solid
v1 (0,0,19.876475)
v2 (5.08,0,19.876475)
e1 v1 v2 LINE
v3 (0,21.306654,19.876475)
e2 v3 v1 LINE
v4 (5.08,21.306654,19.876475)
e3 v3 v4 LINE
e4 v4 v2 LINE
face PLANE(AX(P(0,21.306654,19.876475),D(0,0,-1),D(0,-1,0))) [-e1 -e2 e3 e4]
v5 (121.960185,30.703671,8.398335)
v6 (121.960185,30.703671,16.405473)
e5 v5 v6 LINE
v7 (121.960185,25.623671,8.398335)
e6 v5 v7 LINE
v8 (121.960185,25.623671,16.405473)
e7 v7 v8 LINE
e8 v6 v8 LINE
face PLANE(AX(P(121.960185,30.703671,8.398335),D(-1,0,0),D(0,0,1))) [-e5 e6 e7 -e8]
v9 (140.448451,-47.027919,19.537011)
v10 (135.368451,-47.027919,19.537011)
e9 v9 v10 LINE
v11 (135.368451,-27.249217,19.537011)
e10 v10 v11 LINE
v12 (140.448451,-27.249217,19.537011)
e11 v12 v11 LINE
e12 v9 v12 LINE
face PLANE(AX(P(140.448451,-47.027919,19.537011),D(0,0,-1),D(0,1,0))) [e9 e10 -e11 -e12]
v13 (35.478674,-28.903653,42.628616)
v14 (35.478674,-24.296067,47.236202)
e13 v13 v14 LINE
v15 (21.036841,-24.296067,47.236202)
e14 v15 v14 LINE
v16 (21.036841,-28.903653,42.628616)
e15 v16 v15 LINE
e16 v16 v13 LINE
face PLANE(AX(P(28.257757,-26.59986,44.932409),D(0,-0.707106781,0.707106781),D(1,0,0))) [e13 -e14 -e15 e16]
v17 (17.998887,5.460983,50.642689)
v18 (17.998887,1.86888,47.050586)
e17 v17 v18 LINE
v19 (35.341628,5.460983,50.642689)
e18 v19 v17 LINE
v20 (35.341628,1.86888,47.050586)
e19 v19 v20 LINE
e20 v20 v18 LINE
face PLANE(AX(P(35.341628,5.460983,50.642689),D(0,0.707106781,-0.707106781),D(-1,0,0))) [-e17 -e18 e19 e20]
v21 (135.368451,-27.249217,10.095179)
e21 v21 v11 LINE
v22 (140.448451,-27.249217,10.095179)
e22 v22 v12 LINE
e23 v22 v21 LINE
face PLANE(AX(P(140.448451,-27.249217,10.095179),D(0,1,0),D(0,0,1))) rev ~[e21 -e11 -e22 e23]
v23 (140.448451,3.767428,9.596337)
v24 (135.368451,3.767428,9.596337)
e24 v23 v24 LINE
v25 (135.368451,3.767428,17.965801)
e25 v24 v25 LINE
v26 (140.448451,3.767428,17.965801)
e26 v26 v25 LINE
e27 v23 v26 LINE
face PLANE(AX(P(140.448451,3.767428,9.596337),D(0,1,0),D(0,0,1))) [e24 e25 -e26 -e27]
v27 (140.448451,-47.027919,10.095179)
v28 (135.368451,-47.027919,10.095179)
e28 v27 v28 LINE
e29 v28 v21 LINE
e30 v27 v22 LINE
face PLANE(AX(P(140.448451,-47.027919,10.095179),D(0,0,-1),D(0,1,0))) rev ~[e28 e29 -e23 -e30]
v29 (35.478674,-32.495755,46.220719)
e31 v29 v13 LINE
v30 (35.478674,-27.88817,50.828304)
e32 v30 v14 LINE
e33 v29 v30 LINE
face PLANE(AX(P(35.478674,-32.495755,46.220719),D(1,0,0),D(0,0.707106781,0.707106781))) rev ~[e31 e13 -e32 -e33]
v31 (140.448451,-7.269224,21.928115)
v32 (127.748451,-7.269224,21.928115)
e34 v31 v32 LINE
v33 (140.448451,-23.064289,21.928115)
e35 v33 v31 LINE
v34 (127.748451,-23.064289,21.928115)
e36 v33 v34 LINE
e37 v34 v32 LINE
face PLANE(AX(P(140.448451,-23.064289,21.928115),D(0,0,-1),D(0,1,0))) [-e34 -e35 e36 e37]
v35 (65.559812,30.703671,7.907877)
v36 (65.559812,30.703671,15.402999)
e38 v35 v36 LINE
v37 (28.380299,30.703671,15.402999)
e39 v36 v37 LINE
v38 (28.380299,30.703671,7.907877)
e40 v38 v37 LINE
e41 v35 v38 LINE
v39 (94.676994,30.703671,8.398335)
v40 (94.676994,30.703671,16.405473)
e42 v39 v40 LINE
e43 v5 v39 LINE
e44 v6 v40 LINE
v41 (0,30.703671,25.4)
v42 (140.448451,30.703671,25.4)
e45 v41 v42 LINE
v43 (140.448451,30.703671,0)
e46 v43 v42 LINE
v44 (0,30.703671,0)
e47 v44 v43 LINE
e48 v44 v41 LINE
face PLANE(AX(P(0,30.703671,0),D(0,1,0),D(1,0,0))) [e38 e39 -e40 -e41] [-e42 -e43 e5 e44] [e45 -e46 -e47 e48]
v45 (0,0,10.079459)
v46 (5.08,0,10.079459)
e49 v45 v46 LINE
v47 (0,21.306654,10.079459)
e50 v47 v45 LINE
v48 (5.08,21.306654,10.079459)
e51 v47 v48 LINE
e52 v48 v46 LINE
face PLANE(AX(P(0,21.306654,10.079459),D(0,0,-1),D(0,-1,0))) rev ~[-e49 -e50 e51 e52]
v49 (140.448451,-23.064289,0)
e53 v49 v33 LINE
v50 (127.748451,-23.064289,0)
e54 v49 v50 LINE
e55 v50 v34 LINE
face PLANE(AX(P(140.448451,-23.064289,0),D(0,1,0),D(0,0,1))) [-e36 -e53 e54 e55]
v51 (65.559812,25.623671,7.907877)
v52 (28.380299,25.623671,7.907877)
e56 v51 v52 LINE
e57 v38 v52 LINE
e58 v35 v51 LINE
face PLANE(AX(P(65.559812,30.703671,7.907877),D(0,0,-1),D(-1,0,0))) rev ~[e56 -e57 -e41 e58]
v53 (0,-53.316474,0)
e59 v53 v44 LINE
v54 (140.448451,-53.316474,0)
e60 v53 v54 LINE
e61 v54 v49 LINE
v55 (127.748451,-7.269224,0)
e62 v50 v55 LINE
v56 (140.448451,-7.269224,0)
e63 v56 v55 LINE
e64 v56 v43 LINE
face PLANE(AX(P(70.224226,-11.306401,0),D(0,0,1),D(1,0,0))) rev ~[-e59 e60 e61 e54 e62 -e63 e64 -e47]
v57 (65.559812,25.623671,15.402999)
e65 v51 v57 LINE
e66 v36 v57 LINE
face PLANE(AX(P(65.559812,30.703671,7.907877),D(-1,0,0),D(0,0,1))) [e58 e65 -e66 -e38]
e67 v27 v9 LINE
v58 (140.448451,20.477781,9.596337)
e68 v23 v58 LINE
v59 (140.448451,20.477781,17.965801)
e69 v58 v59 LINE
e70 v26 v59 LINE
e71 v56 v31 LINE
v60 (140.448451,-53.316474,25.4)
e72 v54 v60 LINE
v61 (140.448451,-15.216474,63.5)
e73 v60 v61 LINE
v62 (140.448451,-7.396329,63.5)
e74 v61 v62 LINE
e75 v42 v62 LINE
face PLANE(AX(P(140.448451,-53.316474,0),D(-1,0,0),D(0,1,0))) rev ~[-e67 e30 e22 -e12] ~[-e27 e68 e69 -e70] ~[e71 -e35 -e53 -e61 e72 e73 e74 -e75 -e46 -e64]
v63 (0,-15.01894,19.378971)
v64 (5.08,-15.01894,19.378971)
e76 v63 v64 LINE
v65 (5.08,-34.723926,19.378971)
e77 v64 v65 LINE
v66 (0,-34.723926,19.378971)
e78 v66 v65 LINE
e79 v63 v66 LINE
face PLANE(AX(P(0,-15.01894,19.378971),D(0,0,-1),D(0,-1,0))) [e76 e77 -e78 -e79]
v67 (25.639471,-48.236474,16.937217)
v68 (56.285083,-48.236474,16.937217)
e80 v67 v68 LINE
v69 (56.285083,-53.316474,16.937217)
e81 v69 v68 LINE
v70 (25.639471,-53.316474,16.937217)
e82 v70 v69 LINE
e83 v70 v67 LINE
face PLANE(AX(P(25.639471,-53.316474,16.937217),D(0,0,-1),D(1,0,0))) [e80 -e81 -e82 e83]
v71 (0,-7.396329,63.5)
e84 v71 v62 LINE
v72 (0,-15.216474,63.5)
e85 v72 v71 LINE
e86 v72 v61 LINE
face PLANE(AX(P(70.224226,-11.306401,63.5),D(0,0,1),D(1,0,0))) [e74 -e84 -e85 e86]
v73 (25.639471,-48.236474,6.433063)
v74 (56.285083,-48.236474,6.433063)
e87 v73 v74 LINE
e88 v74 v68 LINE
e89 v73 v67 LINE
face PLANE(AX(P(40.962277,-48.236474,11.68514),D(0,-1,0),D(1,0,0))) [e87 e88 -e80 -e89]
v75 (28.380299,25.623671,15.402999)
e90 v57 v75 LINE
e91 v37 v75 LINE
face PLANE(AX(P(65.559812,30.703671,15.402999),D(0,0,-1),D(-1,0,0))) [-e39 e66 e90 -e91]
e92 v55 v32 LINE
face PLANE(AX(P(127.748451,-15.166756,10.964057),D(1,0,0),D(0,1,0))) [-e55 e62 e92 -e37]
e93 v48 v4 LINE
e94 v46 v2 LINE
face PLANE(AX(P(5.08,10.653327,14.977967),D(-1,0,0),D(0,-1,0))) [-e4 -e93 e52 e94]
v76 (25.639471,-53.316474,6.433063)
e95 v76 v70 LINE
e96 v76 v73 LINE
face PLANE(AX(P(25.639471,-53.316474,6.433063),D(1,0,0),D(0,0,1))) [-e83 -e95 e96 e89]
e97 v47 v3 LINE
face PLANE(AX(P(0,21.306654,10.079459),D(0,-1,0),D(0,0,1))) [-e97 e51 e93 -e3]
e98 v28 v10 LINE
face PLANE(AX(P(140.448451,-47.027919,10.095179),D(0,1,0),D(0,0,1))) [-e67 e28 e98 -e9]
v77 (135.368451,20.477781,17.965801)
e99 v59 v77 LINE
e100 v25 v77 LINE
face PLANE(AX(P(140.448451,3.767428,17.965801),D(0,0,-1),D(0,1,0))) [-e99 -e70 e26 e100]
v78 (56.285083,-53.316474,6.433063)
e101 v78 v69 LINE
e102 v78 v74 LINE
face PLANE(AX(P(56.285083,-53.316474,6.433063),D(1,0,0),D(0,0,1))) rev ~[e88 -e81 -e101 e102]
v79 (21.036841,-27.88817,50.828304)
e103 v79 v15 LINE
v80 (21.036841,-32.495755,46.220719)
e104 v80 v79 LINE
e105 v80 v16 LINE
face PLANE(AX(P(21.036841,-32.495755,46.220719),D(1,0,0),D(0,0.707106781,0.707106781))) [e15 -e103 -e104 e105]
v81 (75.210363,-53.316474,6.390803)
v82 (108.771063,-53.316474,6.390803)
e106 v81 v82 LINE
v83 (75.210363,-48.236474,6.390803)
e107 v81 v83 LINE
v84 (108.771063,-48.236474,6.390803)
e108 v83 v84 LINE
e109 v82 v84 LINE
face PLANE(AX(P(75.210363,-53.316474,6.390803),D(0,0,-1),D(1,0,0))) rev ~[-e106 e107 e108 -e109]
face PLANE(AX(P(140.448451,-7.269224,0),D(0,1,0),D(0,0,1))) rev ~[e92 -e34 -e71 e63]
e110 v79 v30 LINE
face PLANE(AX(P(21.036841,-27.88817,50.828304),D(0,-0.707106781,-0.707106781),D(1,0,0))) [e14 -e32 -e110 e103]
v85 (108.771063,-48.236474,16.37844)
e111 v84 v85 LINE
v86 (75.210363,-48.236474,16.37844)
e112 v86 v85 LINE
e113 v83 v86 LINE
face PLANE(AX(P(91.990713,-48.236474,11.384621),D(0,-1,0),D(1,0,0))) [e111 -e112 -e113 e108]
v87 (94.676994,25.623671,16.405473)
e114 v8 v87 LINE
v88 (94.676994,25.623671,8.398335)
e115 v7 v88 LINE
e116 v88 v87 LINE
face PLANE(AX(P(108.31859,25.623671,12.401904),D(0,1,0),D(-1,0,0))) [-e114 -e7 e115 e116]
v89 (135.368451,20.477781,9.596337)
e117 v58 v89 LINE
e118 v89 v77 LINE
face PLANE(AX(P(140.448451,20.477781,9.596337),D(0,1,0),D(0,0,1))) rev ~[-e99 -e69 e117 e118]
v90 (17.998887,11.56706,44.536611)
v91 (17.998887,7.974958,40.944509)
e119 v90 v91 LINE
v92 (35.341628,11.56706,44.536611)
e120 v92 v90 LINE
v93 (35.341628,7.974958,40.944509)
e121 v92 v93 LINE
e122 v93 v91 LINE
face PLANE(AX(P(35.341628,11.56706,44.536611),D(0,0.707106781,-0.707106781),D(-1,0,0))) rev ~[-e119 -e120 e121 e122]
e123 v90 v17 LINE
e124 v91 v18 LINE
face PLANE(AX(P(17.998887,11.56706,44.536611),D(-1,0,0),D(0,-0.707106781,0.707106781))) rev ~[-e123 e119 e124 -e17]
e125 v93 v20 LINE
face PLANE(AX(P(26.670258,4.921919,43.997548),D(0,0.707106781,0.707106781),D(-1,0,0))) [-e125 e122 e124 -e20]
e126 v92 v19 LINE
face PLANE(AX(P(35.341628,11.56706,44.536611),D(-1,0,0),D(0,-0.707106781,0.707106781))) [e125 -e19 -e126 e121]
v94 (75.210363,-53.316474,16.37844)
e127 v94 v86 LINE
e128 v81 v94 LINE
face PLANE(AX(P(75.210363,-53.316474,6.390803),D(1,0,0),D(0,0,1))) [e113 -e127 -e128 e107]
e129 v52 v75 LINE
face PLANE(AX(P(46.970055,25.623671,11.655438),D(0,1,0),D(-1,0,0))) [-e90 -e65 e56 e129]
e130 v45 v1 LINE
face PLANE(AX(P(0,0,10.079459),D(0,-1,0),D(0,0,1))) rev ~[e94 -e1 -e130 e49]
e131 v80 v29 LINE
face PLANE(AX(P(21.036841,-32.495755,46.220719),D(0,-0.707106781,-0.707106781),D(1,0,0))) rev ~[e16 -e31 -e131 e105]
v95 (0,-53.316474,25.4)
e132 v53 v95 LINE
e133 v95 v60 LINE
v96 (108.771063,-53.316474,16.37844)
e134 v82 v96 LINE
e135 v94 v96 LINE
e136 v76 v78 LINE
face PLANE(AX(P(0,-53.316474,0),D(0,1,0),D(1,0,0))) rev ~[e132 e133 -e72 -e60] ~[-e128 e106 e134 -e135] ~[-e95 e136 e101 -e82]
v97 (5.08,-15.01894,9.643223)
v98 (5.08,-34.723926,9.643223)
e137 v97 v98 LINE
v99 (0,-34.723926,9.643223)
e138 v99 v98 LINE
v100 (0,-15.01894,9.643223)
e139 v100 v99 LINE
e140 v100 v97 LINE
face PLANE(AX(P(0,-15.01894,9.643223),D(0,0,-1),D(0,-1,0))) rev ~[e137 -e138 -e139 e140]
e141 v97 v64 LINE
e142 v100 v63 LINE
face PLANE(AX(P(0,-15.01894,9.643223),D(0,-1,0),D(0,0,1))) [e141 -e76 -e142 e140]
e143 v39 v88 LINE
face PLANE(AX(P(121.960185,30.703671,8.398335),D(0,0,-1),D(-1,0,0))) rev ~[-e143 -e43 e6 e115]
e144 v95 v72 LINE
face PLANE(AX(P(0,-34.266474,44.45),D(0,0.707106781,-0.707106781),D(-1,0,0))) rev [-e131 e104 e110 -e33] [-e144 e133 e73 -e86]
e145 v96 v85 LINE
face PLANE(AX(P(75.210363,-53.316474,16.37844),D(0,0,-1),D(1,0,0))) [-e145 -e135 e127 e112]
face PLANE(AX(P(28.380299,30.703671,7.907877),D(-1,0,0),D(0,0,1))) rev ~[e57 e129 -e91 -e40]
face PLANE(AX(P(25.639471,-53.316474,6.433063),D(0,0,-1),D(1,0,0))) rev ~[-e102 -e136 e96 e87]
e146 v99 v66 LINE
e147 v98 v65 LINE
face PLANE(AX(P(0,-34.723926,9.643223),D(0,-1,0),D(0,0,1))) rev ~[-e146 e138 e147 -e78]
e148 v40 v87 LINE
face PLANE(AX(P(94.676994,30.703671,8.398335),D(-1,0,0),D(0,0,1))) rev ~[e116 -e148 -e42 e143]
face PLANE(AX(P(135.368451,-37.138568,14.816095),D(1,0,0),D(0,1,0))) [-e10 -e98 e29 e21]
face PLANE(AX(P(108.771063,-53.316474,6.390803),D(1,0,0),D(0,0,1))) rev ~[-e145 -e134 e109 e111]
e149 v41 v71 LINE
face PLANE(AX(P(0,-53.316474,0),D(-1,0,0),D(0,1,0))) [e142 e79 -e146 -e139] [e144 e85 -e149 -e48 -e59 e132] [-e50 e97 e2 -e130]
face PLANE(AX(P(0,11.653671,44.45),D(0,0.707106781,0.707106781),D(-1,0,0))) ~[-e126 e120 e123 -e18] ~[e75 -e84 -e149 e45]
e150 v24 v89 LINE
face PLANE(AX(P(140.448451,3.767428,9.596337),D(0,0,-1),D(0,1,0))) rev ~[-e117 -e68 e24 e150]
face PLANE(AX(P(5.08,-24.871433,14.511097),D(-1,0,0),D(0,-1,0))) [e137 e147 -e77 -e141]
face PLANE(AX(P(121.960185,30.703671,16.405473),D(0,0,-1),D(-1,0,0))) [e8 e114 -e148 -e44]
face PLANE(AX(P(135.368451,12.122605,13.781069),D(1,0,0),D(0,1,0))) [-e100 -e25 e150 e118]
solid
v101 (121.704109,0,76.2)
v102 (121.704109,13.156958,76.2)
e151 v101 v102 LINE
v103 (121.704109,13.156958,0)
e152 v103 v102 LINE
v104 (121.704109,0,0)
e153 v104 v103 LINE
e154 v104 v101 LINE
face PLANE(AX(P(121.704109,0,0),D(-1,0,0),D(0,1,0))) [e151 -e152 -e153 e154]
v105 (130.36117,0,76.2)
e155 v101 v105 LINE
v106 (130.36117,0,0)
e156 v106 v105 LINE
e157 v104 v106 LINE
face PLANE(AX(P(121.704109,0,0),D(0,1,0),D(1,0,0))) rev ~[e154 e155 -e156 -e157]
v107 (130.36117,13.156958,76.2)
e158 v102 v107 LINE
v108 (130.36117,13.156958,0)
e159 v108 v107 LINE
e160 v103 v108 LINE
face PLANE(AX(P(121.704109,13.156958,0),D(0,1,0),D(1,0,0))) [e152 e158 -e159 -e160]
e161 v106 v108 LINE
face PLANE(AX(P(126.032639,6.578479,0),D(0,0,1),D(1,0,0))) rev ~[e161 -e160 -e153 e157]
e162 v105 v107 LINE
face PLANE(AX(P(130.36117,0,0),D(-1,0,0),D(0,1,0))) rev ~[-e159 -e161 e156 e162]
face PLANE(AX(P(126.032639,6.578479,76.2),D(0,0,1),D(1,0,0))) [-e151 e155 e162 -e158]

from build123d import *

# Parameters (mm, degrees)
F0_W      = 140.4484510422
F0_H      = 84.0201452374
F1_DEPTH  = 63.5
F2_SIZE   = 38.1
F3_W      = 8.6570605636
F3_H      = 13.1569579244
F4_DEPTH  = 76.2
F6_W      = 15.7950655557
F6_H      = 21.9281148165
F7_DEPTH  = 12.7
F11_W     = 16.7103528511
F11_H     = 8.3694644272
F12_DEPTH = 5.08
F13_W     = 19.7787024081
F13_H     = 9.4418320805
F14_DEPTH = 5.08
F15_W     = 30.6456126273
F15_H     = 10.5041540228
F16_DEPTH = 5.08
F17_W     = 33.5607007146
F17_H     = 9.9876374006
F18_DEPTH = 5.08
F19_W     = 21.3066544384
F19_H     = 9.7970152274
F20_DEPTH = 5.08
F21_W     = 19.7049863636
F21_H     = 9.7357481718
F22_DEPTH = 5.08
F23_W     = 27.2831916809
F23_H     = 8.0071371049
F24_DEPTH = 5.08
F25_W     = 37.1795129031
F25_H     = 7.4951220304
F26_DEPTH = 5.08
F27_W     = 14.4418329
F27_H     = 6.516110152
F28_DEPTH = 5.08
F29_W     = 17.3427406698
F29_H     = 8.6352974176
F30_DEPTH = 5.08


# Not quite as in the source:
# - the program builds the solid bodies; features that only make, move or delete a surface that nothing else refers to are left out


with BuildPart() as f1:
    # F0 (on Top) → F1 (new body)
    with BuildSketch(Plane.XY):
        with Locations((70.2242255211, -11.3064013422)):
            Rectangle(F0_W, F0_H)
    extrude(amount=F1_DEPTH)

    # F2
    f2_edges = [f1.edges().sort_by_distance(p)[0] for p in [
        (70.224226, -53.316474, 63.5),
        (70.224226, 30.703671, 63.5),
    ]]
    chamfer(f2_edges, length=F2_SIZE)

    # F6 (on face) → F7 (cut)
    with BuildSketch(Plane.YZ.offset(140.4484510422)):
        with Locations((-15.1667564642, 10.9640574083)):
            Rectangle(F6_W, F6_H)
    extrude(amount=-F7_DEPTH, mode=Mode.SUBTRACT)

    # F11 (on face) → F12 (cut)
    with BuildSketch(Plane.YZ.offset(140.4484510422)):
        with Locations((12.1226046467, 13.7810688466)):
            Rectangle(F11_W, F11_H)
    extrude(amount=-F12_DEPTH, mode=Mode.SUBTRACT)

    # F13 (on face) → F14 (cut)
    with BuildSketch(Plane.YZ.offset(140.4484510422)):
        with Locations((-37.1385682374, 14.8160951212)):
            Rectangle(F13_W, F13_H)
    extrude(amount=-F14_DEPTH, mode=Mode.SUBTRACT)

    # F15 (on face) → F16 (cut)
    with BuildSketch(Plane.XZ.offset(53.3164739609)):
        with Locations((40.9622769803, 11.6851397324)):
            Rectangle(F15_W, F15_H)
    extrude(amount=-F16_DEPTH, mode=Mode.SUBTRACT)

    # F17 (on face) → F18 (cut)
    with BuildSketch(Plane.XZ.offset(53.3164739609)):
        with Locations((91.9907130301, 11.3846212626)):
            Rectangle(F17_W, F17_H)
    extrude(amount=-F18_DEPTH, mode=Mode.SUBTRACT)

    # F19 (on face) → F20 (cut)
    with BuildSketch(Plane(origin=(0, 0, 0), x_dir=(0, -1, 0), z_dir=(-1, 0, 0))):
        with Locations((-10.6533272192, 14.9779669009)):
            Rectangle(F19_W, F19_H)
    extrude(amount=-F20_DEPTH, mode=Mode.SUBTRACT)

    # F21 (on face) → F22 (cut)
    with BuildSketch(Plane(origin=(0, 0, 0), x_dir=(0, -1, 0), z_dir=(-1, 0, 0))):
        with Locations((24.8714331537, 14.5110972226)):
            Rectangle(F21_W, F21_H)
    extrude(amount=-F22_DEPTH, mode=Mode.SUBTRACT)

    # F23 (on face) → F24 (cut)
    with BuildSketch(Plane(origin=(0, 30.7036712766, 0), x_dir=(-1, 0, 0), z_dir=(0, 1, 0))):
        with Locations((-108.3185896277, 12.4019039795)):
            Rectangle(F23_W, F23_H)
    extrude(amount=-F24_DEPTH, mode=Mode.SUBTRACT)

    # F25 (on face) → F26 (cut)
    with BuildSketch(Plane(origin=(0, 30.7036712766, 0), x_dir=(-1, 0, 0), z_dir=(0, 1, 0))):
        with Locations((-46.9700554386, 11.6554377601)):
            Rectangle(F25_W, F25_H)
    extrude(amount=-F26_DEPTH, mode=Mode.SUBTRACT)

    # F27 (on face) → F28 (cut)
    with BuildSketch(Plane(origin=(0, -39.3582369804, 39.3582369804), x_dir=(1, 0, 0), z_dir=(0, -0.7071067812, 0.7071067812))):
        with Locations((28.2577574253, 12.9630696028)):
            Rectangle(F27_W, F27_H)
    extrude(amount=-F28_DEPTH, mode=Mode.SUBTRACT)

    # F29 (on face) → F30 (cut)
    with BuildSketch(Plane(origin=(0, 28.0518356383, 28.0518356383), x_dir=(-1, 0, 0), z_dir=(0, 0.7071067812, 0.7071067812))):
        with Locations((-26.6702575609, 27.6306420565)):
            Rectangle(F29_W, F29_H)
    extrude(amount=-F30_DEPTH, mode=Mode.SUBTRACT)


with BuildPart() as f4:
    # F3 (on Top) → F4 (new body)
    with BuildSketch(Plane.XY):
        with Locations((126.0326392949, 6.5784789622)):
            Rectangle(F3_W, F3_H)
    extrude(amount=F4_DEPTH)


solid = Compound([f1.part, f4.part])
